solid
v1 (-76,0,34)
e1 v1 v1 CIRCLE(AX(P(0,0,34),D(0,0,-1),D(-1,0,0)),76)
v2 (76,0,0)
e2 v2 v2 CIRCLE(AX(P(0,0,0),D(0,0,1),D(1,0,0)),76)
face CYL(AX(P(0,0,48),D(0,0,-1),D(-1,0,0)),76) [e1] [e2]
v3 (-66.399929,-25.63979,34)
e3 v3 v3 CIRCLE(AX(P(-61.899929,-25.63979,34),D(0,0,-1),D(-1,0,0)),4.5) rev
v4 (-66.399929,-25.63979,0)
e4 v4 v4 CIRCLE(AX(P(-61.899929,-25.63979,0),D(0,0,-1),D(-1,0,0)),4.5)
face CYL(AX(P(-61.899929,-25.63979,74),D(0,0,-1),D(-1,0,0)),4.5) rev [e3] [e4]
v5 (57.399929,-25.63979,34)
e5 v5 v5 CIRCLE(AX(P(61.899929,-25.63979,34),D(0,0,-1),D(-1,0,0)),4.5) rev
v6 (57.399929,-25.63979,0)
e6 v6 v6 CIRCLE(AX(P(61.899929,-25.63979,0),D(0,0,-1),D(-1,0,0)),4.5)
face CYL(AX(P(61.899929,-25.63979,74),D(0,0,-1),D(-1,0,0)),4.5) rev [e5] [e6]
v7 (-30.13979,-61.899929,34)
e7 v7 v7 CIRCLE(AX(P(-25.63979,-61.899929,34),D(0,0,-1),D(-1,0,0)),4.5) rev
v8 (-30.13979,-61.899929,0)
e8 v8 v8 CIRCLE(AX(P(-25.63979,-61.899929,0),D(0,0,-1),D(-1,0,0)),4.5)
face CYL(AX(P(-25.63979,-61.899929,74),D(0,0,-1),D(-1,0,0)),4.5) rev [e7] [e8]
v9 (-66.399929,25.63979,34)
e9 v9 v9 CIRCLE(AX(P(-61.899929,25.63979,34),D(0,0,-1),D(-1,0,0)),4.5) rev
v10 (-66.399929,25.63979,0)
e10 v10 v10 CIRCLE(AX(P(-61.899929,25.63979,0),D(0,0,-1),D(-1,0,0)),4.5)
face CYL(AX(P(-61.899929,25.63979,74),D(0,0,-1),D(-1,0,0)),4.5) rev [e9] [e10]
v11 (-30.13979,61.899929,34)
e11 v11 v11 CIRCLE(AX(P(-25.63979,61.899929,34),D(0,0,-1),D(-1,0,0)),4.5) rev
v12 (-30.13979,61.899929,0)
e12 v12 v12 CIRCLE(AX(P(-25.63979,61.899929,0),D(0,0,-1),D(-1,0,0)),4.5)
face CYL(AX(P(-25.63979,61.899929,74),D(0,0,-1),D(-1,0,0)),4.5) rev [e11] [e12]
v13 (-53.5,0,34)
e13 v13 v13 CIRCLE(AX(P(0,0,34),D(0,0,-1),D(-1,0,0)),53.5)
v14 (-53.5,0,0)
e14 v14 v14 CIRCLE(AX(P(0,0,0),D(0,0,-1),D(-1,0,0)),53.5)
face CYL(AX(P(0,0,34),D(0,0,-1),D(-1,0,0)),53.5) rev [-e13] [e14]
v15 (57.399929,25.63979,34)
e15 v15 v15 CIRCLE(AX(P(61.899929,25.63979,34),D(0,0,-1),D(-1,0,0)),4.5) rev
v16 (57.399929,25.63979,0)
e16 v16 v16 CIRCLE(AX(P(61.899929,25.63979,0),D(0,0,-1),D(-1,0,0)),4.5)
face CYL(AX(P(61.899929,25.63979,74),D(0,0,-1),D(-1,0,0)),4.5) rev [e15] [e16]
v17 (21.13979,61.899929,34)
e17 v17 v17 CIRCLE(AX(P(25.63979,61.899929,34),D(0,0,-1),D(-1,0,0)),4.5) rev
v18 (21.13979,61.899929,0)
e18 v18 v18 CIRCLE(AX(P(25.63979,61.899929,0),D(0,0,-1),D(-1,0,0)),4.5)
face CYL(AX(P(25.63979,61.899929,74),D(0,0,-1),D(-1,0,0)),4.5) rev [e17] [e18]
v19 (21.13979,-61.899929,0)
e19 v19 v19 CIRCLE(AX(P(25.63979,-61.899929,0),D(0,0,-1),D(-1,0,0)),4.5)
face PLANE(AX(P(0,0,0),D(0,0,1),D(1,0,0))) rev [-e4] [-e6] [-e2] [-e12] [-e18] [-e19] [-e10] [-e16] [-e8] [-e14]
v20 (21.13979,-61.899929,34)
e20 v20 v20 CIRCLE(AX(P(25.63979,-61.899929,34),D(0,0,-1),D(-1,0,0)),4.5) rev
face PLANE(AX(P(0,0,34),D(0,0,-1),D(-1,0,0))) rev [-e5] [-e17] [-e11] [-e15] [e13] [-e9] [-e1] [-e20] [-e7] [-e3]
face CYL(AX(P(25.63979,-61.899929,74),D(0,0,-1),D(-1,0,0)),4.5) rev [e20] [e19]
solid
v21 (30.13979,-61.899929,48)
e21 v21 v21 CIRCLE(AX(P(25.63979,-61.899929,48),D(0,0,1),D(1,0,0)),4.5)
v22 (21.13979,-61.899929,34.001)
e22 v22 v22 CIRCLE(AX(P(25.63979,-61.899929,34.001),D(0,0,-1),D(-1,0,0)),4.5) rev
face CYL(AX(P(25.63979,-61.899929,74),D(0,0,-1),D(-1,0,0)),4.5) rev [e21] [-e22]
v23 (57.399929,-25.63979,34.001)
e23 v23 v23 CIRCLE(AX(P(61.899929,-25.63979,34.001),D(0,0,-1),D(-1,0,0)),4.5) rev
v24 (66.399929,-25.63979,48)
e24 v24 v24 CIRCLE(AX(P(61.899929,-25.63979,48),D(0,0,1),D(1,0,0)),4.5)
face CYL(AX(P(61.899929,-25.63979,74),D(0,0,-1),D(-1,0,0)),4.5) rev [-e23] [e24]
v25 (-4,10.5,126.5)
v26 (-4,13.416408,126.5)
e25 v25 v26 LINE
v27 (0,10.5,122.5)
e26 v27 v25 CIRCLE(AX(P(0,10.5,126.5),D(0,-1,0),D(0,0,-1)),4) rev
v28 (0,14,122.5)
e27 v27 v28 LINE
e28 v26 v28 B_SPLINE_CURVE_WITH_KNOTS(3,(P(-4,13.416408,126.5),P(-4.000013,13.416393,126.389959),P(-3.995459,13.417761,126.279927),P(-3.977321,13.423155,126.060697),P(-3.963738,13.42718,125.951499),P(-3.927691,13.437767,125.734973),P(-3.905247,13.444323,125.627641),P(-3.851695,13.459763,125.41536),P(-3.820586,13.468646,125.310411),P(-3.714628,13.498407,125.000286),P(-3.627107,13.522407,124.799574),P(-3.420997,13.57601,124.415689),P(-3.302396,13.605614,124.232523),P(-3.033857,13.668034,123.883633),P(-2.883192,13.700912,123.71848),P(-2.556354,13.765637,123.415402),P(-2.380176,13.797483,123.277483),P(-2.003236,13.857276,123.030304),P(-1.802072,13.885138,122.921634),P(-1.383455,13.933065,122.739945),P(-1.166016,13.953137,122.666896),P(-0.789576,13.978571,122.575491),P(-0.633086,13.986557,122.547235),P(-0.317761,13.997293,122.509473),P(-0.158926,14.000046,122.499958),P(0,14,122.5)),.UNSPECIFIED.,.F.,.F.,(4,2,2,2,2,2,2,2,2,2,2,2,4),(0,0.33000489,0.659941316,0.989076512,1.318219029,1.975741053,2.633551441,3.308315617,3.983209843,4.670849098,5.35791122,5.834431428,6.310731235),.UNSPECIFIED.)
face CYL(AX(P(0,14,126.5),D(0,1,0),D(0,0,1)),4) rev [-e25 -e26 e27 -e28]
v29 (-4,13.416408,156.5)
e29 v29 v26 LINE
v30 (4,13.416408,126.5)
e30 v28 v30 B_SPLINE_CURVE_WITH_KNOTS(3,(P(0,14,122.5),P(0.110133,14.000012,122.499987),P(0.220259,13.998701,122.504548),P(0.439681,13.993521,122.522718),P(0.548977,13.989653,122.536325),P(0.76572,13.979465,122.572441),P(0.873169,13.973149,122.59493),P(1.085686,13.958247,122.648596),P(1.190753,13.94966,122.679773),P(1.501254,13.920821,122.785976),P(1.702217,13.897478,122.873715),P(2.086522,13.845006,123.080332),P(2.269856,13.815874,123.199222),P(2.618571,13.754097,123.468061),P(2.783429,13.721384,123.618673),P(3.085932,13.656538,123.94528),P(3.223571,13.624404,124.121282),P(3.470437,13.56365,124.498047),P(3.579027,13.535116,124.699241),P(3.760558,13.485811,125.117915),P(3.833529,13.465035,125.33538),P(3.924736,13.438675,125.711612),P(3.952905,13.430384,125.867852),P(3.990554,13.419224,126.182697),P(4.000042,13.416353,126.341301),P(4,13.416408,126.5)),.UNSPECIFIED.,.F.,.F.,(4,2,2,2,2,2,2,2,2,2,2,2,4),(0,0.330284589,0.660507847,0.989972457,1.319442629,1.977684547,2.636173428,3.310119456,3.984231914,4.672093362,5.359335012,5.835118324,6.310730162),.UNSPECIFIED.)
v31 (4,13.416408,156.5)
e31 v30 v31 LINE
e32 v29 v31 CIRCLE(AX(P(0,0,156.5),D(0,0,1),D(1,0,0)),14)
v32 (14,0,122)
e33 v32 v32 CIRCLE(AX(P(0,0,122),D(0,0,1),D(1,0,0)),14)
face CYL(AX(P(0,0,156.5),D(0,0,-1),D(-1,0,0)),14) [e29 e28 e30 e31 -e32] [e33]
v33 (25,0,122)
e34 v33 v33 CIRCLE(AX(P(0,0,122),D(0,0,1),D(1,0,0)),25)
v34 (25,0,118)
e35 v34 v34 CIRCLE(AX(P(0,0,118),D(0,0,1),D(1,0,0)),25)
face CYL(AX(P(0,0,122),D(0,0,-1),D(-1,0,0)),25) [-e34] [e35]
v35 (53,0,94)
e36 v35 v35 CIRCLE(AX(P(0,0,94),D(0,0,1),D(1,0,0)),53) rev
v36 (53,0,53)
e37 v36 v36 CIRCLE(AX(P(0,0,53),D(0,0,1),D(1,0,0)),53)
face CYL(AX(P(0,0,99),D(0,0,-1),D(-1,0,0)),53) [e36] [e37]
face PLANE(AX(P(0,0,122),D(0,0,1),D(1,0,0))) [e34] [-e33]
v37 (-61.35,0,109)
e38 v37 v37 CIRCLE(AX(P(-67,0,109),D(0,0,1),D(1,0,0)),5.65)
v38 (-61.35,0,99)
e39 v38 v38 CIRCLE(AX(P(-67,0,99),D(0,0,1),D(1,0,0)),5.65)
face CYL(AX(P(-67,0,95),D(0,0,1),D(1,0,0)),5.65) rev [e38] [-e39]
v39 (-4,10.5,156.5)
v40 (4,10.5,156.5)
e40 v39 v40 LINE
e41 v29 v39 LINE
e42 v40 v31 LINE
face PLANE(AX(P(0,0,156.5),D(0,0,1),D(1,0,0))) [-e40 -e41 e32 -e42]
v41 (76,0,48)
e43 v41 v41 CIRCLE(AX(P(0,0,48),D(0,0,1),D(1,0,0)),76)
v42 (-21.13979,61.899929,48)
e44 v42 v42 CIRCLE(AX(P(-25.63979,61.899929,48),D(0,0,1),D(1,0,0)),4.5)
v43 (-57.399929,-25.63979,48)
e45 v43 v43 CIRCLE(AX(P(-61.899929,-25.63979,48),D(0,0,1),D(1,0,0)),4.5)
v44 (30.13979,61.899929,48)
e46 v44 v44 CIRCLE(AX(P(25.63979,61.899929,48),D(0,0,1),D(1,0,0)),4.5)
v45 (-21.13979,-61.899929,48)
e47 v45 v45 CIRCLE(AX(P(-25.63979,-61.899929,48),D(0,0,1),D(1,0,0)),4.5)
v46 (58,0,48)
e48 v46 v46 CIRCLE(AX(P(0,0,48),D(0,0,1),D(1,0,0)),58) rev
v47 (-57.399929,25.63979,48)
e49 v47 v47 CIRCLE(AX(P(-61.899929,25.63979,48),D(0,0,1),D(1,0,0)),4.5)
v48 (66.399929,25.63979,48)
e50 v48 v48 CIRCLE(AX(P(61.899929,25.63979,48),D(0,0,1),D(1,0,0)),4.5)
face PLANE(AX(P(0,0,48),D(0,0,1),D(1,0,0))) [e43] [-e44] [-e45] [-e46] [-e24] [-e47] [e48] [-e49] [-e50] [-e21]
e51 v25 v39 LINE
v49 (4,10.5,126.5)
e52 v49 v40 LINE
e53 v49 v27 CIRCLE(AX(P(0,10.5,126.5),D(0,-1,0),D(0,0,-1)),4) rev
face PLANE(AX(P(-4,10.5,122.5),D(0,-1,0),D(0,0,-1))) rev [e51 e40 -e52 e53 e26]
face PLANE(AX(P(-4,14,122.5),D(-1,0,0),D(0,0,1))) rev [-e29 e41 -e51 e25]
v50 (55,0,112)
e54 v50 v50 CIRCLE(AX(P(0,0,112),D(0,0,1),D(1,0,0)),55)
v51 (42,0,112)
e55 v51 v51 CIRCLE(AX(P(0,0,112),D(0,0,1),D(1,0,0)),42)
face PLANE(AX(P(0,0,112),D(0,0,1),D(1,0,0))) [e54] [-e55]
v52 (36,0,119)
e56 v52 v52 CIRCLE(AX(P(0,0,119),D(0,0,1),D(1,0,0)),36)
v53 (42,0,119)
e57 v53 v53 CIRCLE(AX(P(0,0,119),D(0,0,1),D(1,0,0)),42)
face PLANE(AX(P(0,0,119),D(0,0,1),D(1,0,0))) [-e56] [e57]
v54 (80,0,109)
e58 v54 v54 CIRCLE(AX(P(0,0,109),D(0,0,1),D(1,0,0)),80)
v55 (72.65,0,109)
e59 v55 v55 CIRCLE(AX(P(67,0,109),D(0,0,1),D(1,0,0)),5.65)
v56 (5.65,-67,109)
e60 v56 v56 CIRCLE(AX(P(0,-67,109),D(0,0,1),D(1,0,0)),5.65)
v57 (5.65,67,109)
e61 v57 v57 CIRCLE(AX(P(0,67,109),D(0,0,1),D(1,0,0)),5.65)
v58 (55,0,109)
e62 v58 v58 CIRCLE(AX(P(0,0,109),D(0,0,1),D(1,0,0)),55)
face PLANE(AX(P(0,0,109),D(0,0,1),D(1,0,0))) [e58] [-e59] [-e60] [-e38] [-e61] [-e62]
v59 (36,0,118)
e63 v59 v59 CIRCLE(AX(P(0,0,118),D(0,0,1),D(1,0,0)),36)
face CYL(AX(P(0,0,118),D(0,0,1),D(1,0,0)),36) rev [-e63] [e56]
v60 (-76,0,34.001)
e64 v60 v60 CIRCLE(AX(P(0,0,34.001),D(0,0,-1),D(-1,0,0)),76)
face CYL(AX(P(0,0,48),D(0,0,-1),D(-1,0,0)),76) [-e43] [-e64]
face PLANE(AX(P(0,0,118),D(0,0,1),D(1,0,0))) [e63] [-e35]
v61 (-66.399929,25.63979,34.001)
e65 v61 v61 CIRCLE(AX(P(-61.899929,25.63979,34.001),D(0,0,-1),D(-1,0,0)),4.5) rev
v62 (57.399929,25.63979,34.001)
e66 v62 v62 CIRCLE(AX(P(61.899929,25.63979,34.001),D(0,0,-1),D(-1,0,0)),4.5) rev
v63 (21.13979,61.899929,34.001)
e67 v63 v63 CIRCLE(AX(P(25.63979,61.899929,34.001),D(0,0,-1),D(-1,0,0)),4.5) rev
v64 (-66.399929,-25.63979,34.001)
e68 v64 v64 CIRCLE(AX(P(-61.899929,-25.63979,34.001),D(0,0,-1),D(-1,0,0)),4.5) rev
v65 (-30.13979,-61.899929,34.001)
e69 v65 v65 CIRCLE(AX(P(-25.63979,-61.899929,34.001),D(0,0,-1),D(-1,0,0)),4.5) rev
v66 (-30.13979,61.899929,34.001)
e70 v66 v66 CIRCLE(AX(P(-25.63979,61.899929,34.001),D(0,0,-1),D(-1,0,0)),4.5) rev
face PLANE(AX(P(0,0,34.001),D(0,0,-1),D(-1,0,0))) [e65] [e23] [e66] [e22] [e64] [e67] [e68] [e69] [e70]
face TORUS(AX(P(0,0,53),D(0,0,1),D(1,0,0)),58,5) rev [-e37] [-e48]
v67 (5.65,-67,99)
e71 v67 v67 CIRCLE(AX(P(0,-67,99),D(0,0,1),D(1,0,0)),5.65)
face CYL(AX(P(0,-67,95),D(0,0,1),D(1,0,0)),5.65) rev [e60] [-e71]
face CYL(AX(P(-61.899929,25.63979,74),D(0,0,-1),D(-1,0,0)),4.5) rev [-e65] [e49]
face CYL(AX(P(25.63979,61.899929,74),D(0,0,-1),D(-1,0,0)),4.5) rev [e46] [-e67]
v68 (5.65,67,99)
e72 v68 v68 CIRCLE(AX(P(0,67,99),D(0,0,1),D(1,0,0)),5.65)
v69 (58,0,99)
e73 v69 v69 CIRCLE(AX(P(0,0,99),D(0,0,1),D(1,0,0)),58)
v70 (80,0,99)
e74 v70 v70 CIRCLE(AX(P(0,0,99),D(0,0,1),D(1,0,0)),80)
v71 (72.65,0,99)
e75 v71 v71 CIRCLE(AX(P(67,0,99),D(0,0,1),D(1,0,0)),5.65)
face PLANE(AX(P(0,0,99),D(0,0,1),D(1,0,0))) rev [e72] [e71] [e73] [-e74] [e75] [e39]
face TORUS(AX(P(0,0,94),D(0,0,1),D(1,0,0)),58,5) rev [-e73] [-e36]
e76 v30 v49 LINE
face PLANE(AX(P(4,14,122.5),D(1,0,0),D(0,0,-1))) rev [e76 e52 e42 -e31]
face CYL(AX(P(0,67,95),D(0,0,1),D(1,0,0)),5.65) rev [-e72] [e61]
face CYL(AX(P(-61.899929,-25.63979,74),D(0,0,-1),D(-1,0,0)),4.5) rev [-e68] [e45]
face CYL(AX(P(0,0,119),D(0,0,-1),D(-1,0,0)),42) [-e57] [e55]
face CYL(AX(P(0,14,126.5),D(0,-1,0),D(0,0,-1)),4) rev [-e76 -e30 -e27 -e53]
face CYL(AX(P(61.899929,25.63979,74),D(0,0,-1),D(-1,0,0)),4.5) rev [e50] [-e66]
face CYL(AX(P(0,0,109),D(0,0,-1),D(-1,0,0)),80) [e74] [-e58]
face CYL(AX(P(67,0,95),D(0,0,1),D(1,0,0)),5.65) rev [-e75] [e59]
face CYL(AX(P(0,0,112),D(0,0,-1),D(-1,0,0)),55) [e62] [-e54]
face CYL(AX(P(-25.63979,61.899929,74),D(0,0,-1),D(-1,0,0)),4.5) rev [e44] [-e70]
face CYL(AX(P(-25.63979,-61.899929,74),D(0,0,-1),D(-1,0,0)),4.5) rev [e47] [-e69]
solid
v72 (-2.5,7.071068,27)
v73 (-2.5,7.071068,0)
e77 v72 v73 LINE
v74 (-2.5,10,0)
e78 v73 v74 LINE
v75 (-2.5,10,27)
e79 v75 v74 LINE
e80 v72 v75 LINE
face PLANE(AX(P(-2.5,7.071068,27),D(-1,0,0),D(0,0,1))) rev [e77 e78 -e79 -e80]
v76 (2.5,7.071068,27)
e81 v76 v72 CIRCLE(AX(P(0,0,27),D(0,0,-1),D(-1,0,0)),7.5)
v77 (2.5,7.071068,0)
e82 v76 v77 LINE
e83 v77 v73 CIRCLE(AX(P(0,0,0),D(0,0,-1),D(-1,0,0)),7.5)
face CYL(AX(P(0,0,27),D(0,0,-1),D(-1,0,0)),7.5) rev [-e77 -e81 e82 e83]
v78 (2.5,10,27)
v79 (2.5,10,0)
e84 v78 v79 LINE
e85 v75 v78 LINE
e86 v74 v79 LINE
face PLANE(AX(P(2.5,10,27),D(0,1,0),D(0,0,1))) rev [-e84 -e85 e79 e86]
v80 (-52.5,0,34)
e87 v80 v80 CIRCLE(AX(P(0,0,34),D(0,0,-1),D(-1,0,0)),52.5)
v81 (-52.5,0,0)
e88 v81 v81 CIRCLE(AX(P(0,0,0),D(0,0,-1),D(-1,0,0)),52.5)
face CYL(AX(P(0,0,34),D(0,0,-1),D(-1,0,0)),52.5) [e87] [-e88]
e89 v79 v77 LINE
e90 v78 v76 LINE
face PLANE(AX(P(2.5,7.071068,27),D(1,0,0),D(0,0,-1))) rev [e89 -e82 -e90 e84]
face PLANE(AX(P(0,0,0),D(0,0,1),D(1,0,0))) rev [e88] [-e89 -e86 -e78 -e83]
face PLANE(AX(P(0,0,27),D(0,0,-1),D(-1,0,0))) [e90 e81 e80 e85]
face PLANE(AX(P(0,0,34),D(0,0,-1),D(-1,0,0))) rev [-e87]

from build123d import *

# Parameters (mm, degrees)
SKETCH_1_R          = 76
EXTRUDE_1_DEPTH     = 48
SKETCH_2_R          = 53
EXTRUDE_2_DEPTH     = 51
SKETCH_3_R          = 80
EXTRUDE_3_DEPTH     = 10
FILLET_1_R          = 5
SKETCH_4_R          = 55
EXTRUDE_4_DEPTH     = 3
SKETCH_5_R          = 42
EXTRUDE_5_DEPTH     = 7
SKETCH_6_R          = 25
EXTRUDE_6_DEPTH     = 3
CUT_EXTRUDE_START   = -1
SKETCH_7_R          = 36
SKETCH_7_R_2        = 25
CUT_EXTRUDE_1_DEPTH = 1
SKETCH_8_R          = 14
EXTRUDE_7_DEPTH     = 34.5
SKETCH_9_W          = 8
SKETCH_9_H          = 3.5
CUT_EXTRUDE_3_DEPTH = 34
FILLET_2_R          = 4
SKETCH_10_R         = 5.65
CUT_EXTRUDE_4_DEPTH = 14
SKETCH_11_R         = 4.5
CUT_EXTRUDE_5_DEPTH = 74
SKETCH_12_R         = 76
CUT_EXTRUDE_6_DEPTH = 0.001
SKETCH_13_R         = 53.5
SKETCH_13_R_2       = 52.5
CUT_EXTRUDE_7_DEPTH = 34
SKETCH_14_R         = 7.5
CUT_EXTRUDE_8_DEPTH = 27
CUT_EXTRUDE_9_DEPTH = 27


with BuildPart() as part:
    # 草图1 → 拉伸1 (new body)
    with BuildSketch(Plane.XY):
        Circle(SKETCH_1_R)
    extrude(amount=EXTRUDE_1_DEPTH)

    # 草图2 → 拉伸2 (add)
    with BuildSketch(Plane.XY.offset(48)):
        Circle(SKETCH_2_R)
    extrude(amount=EXTRUDE_2_DEPTH)

    # 草图3 → 拉伸3 (add)
    with BuildSketch(Plane.XY.offset(99)):
        Circle(SKETCH_3_R)
    extrude(amount=EXTRUDE_3_DEPTH)

    # 圆角1
    fillet_1_edges = [part.edges().sort_by_distance(p)[0] for p in [
        (-53, 0, 48),
        (-53, 0, 99),
    ]]
    fillet(fillet_1_edges, radius=FILLET_1_R)

    # 草图4 → 拉伸4 (add)
    with BuildSketch(Plane.XY.offset(109)):
        Circle(SKETCH_4_R)
    extrude(amount=EXTRUDE_4_DEPTH)

    # 草图5 → 拉伸5 (add)
    with BuildSketch(Plane.XY.offset(112)):
        Circle(SKETCH_5_R)
    extrude(amount=EXTRUDE_5_DEPTH)

    # 草图6 → 拉伸6 (add)
    with BuildSketch(Plane.XY.offset(119)):
        Circle(SKETCH_6_R)
    extrude(amount=EXTRUDE_6_DEPTH)

    # 草图7 → 切除-拉伸1 (cut)
    with BuildSketch(Plane.XY.offset(119).offset(CUT_EXTRUDE_START)):
        Circle(SKETCH_7_R)
        Circle(SKETCH_7_R_2, mode=Mode.SUBTRACT)
    extrude(amount=CUT_EXTRUDE_1_DEPTH, mode=Mode.SUBTRACT)

    # 草图8 → 拉伸7 (add)
    with BuildSketch(Plane.XY.offset(122)):
        Circle(SKETCH_8_R)
    extrude(amount=EXTRUDE_7_DEPTH)

    # 草图9 → 切除-拉伸3 (cut)
    with BuildSketch(Plane.XY.offset(156.5)):
        with Locations((0, 12.25)):
            Rectangle(SKETCH_9_W, SKETCH_9_H)
    extrude(amount=-CUT_EXTRUDE_3_DEPTH, mode=Mode.SUBTRACT)

    # 圆角2
    fillet_2_edges = [part.edges().sort_by_distance(p)[0] for p in [
        (-4, 11.958203932, 122.5),
        (4, 11.958203932, 122.5),
    ]]
    fillet(fillet_2_edges, radius=FILLET_2_R - 0.0001)  # a hair under: the kernel refuses the full size

    # 草图10 → 切除-拉伸4 (cut)
    with BuildSketch(Plane.XY.offset(109)):
        with Locations((0, 67)):
            Circle(SKETCH_10_R)
        with Locations((67, 0)):
            Circle(SKETCH_10_R)
        with Locations((0, -67)):
            Circle(SKETCH_10_R)
        with Locations((-67, 0)):
            Circle(SKETCH_10_R)
    extrude(amount=-CUT_EXTRUDE_4_DEPTH, mode=Mode.SUBTRACT)

    # 草图11 → 切除-拉伸5 (cut)
    with BuildSketch(Plane(origin=(0, 0, 0), x_dir=(-1, 0, 0), z_dir=(0, 0, -1))):
        with Locations((61.899928678, 25.639789968)):
            Circle(SKETCH_11_R)
        with Locations((61.899928678, -25.639789968)):
            Circle(SKETCH_11_R)
        with Locations((25.639789968, -61.899928678)):
            Circle(SKETCH_11_R)
        with Locations((-25.639789968, -61.899928678)):
            Circle(SKETCH_11_R)
        with Locations((-61.899928678, -25.639789968)):
            Circle(SKETCH_11_R)
        with Locations((-61.899928678, 25.639789968)):
            Circle(SKETCH_11_R)
        with Locations((-25.639789968, 61.899928678)):
            Circle(SKETCH_11_R)
        with Locations((25.639789968, 61.899928678)):
            Circle(SKETCH_11_R)
    extrude(amount=-CUT_EXTRUDE_5_DEPTH, mode=Mode.SUBTRACT)

    # 草图12 → 切除-拉伸6 (cut)
    with BuildSketch(Plane(origin=(0, 0, 34), x_dir=(-1, 0, 0), z_dir=(0, 0, -1))):
        Circle(SKETCH_12_R)
    extrude(amount=-CUT_EXTRUDE_6_DEPTH, mode=Mode.SUBTRACT)


with BuildPart() as cut_extrude_6_piece_1:
    # of the separate pieces the step leaves, piece 1, a body of its own (cut_extrude_6_pieces)
    add(part.part.solids().sort_by_distance((4, 13.416407865, 126.4999))[0])


with BuildPart() as cut_extrude_6_piece_2:
    # of the separate pieces the step leaves, piece 2, a body of its own (cut_extrude_6_pieces)
    add(part.part.solids().sort_by_distance((76, 0, 0))[0])

    # 草图13 → 切除-拉伸7 (cut)
    with BuildSketch(Plane(origin=(0, 0, 0), x_dir=(-1, 0, 0), z_dir=(0, 0, -1))):
        Circle(SKETCH_13_R)
        Circle(SKETCH_13_R_2, mode=Mode.SUBTRACT)
    extrude(amount=-CUT_EXTRUDE_7_DEPTH, mode=Mode.SUBTRACT)


with BuildPart() as cut_extrude_7_piece_1:
    # of the separate pieces the step leaves, piece 1, a body of its own (cut_extrude_7_pieces)
    add(cut_extrude_6_piece_2.part.solids().sort_by_distance((-52.5, 0, 0))[0])

    # 草图14 → 切除-拉伸8 (cut)
    with BuildSketch(Plane(origin=(0, 0, 0), x_dir=(-1, 0, 0), z_dir=(0, 0, -1))):
        Circle(SKETCH_14_R)
    extrude(amount=-CUT_EXTRUDE_8_DEPTH, mode=Mode.SUBTRACT)

    # 草图15 → 切除-拉伸9 (cut)
    with BuildSketch(Plane(origin=(0, 0, 0), x_dir=(-1, 0, 0), z_dir=(0, 0, -1))):
        with BuildLine():
            Line((-2.5, 10), (2.5, 10))
            Line((2.5, 10), (2.5, 7.071067812))
            ThreePointArc((2.5, 7.071067812), (0, 7.5), (-2.5, 7.071067812))
            Line((-2.5, 7.071067812), (-2.5, 10))
        make_face()
    extrude(amount=-CUT_EXTRUDE_9_DEPTH, mode=Mode.SUBTRACT)


with BuildPart() as cut_extrude_7_piece_2:
    # of the separate pieces the step leaves, piece 2, a body of its own (cut_extrude_7_pieces)
    add(cut_extrude_6_piece_2.part.solids().sort_by_distance((76, 0, 0))[0])


solid = Compound([cut_extrude_6_piece_1.part, cut_extrude_7_piece_1.part, cut_extrude_7_piece_2.part])
